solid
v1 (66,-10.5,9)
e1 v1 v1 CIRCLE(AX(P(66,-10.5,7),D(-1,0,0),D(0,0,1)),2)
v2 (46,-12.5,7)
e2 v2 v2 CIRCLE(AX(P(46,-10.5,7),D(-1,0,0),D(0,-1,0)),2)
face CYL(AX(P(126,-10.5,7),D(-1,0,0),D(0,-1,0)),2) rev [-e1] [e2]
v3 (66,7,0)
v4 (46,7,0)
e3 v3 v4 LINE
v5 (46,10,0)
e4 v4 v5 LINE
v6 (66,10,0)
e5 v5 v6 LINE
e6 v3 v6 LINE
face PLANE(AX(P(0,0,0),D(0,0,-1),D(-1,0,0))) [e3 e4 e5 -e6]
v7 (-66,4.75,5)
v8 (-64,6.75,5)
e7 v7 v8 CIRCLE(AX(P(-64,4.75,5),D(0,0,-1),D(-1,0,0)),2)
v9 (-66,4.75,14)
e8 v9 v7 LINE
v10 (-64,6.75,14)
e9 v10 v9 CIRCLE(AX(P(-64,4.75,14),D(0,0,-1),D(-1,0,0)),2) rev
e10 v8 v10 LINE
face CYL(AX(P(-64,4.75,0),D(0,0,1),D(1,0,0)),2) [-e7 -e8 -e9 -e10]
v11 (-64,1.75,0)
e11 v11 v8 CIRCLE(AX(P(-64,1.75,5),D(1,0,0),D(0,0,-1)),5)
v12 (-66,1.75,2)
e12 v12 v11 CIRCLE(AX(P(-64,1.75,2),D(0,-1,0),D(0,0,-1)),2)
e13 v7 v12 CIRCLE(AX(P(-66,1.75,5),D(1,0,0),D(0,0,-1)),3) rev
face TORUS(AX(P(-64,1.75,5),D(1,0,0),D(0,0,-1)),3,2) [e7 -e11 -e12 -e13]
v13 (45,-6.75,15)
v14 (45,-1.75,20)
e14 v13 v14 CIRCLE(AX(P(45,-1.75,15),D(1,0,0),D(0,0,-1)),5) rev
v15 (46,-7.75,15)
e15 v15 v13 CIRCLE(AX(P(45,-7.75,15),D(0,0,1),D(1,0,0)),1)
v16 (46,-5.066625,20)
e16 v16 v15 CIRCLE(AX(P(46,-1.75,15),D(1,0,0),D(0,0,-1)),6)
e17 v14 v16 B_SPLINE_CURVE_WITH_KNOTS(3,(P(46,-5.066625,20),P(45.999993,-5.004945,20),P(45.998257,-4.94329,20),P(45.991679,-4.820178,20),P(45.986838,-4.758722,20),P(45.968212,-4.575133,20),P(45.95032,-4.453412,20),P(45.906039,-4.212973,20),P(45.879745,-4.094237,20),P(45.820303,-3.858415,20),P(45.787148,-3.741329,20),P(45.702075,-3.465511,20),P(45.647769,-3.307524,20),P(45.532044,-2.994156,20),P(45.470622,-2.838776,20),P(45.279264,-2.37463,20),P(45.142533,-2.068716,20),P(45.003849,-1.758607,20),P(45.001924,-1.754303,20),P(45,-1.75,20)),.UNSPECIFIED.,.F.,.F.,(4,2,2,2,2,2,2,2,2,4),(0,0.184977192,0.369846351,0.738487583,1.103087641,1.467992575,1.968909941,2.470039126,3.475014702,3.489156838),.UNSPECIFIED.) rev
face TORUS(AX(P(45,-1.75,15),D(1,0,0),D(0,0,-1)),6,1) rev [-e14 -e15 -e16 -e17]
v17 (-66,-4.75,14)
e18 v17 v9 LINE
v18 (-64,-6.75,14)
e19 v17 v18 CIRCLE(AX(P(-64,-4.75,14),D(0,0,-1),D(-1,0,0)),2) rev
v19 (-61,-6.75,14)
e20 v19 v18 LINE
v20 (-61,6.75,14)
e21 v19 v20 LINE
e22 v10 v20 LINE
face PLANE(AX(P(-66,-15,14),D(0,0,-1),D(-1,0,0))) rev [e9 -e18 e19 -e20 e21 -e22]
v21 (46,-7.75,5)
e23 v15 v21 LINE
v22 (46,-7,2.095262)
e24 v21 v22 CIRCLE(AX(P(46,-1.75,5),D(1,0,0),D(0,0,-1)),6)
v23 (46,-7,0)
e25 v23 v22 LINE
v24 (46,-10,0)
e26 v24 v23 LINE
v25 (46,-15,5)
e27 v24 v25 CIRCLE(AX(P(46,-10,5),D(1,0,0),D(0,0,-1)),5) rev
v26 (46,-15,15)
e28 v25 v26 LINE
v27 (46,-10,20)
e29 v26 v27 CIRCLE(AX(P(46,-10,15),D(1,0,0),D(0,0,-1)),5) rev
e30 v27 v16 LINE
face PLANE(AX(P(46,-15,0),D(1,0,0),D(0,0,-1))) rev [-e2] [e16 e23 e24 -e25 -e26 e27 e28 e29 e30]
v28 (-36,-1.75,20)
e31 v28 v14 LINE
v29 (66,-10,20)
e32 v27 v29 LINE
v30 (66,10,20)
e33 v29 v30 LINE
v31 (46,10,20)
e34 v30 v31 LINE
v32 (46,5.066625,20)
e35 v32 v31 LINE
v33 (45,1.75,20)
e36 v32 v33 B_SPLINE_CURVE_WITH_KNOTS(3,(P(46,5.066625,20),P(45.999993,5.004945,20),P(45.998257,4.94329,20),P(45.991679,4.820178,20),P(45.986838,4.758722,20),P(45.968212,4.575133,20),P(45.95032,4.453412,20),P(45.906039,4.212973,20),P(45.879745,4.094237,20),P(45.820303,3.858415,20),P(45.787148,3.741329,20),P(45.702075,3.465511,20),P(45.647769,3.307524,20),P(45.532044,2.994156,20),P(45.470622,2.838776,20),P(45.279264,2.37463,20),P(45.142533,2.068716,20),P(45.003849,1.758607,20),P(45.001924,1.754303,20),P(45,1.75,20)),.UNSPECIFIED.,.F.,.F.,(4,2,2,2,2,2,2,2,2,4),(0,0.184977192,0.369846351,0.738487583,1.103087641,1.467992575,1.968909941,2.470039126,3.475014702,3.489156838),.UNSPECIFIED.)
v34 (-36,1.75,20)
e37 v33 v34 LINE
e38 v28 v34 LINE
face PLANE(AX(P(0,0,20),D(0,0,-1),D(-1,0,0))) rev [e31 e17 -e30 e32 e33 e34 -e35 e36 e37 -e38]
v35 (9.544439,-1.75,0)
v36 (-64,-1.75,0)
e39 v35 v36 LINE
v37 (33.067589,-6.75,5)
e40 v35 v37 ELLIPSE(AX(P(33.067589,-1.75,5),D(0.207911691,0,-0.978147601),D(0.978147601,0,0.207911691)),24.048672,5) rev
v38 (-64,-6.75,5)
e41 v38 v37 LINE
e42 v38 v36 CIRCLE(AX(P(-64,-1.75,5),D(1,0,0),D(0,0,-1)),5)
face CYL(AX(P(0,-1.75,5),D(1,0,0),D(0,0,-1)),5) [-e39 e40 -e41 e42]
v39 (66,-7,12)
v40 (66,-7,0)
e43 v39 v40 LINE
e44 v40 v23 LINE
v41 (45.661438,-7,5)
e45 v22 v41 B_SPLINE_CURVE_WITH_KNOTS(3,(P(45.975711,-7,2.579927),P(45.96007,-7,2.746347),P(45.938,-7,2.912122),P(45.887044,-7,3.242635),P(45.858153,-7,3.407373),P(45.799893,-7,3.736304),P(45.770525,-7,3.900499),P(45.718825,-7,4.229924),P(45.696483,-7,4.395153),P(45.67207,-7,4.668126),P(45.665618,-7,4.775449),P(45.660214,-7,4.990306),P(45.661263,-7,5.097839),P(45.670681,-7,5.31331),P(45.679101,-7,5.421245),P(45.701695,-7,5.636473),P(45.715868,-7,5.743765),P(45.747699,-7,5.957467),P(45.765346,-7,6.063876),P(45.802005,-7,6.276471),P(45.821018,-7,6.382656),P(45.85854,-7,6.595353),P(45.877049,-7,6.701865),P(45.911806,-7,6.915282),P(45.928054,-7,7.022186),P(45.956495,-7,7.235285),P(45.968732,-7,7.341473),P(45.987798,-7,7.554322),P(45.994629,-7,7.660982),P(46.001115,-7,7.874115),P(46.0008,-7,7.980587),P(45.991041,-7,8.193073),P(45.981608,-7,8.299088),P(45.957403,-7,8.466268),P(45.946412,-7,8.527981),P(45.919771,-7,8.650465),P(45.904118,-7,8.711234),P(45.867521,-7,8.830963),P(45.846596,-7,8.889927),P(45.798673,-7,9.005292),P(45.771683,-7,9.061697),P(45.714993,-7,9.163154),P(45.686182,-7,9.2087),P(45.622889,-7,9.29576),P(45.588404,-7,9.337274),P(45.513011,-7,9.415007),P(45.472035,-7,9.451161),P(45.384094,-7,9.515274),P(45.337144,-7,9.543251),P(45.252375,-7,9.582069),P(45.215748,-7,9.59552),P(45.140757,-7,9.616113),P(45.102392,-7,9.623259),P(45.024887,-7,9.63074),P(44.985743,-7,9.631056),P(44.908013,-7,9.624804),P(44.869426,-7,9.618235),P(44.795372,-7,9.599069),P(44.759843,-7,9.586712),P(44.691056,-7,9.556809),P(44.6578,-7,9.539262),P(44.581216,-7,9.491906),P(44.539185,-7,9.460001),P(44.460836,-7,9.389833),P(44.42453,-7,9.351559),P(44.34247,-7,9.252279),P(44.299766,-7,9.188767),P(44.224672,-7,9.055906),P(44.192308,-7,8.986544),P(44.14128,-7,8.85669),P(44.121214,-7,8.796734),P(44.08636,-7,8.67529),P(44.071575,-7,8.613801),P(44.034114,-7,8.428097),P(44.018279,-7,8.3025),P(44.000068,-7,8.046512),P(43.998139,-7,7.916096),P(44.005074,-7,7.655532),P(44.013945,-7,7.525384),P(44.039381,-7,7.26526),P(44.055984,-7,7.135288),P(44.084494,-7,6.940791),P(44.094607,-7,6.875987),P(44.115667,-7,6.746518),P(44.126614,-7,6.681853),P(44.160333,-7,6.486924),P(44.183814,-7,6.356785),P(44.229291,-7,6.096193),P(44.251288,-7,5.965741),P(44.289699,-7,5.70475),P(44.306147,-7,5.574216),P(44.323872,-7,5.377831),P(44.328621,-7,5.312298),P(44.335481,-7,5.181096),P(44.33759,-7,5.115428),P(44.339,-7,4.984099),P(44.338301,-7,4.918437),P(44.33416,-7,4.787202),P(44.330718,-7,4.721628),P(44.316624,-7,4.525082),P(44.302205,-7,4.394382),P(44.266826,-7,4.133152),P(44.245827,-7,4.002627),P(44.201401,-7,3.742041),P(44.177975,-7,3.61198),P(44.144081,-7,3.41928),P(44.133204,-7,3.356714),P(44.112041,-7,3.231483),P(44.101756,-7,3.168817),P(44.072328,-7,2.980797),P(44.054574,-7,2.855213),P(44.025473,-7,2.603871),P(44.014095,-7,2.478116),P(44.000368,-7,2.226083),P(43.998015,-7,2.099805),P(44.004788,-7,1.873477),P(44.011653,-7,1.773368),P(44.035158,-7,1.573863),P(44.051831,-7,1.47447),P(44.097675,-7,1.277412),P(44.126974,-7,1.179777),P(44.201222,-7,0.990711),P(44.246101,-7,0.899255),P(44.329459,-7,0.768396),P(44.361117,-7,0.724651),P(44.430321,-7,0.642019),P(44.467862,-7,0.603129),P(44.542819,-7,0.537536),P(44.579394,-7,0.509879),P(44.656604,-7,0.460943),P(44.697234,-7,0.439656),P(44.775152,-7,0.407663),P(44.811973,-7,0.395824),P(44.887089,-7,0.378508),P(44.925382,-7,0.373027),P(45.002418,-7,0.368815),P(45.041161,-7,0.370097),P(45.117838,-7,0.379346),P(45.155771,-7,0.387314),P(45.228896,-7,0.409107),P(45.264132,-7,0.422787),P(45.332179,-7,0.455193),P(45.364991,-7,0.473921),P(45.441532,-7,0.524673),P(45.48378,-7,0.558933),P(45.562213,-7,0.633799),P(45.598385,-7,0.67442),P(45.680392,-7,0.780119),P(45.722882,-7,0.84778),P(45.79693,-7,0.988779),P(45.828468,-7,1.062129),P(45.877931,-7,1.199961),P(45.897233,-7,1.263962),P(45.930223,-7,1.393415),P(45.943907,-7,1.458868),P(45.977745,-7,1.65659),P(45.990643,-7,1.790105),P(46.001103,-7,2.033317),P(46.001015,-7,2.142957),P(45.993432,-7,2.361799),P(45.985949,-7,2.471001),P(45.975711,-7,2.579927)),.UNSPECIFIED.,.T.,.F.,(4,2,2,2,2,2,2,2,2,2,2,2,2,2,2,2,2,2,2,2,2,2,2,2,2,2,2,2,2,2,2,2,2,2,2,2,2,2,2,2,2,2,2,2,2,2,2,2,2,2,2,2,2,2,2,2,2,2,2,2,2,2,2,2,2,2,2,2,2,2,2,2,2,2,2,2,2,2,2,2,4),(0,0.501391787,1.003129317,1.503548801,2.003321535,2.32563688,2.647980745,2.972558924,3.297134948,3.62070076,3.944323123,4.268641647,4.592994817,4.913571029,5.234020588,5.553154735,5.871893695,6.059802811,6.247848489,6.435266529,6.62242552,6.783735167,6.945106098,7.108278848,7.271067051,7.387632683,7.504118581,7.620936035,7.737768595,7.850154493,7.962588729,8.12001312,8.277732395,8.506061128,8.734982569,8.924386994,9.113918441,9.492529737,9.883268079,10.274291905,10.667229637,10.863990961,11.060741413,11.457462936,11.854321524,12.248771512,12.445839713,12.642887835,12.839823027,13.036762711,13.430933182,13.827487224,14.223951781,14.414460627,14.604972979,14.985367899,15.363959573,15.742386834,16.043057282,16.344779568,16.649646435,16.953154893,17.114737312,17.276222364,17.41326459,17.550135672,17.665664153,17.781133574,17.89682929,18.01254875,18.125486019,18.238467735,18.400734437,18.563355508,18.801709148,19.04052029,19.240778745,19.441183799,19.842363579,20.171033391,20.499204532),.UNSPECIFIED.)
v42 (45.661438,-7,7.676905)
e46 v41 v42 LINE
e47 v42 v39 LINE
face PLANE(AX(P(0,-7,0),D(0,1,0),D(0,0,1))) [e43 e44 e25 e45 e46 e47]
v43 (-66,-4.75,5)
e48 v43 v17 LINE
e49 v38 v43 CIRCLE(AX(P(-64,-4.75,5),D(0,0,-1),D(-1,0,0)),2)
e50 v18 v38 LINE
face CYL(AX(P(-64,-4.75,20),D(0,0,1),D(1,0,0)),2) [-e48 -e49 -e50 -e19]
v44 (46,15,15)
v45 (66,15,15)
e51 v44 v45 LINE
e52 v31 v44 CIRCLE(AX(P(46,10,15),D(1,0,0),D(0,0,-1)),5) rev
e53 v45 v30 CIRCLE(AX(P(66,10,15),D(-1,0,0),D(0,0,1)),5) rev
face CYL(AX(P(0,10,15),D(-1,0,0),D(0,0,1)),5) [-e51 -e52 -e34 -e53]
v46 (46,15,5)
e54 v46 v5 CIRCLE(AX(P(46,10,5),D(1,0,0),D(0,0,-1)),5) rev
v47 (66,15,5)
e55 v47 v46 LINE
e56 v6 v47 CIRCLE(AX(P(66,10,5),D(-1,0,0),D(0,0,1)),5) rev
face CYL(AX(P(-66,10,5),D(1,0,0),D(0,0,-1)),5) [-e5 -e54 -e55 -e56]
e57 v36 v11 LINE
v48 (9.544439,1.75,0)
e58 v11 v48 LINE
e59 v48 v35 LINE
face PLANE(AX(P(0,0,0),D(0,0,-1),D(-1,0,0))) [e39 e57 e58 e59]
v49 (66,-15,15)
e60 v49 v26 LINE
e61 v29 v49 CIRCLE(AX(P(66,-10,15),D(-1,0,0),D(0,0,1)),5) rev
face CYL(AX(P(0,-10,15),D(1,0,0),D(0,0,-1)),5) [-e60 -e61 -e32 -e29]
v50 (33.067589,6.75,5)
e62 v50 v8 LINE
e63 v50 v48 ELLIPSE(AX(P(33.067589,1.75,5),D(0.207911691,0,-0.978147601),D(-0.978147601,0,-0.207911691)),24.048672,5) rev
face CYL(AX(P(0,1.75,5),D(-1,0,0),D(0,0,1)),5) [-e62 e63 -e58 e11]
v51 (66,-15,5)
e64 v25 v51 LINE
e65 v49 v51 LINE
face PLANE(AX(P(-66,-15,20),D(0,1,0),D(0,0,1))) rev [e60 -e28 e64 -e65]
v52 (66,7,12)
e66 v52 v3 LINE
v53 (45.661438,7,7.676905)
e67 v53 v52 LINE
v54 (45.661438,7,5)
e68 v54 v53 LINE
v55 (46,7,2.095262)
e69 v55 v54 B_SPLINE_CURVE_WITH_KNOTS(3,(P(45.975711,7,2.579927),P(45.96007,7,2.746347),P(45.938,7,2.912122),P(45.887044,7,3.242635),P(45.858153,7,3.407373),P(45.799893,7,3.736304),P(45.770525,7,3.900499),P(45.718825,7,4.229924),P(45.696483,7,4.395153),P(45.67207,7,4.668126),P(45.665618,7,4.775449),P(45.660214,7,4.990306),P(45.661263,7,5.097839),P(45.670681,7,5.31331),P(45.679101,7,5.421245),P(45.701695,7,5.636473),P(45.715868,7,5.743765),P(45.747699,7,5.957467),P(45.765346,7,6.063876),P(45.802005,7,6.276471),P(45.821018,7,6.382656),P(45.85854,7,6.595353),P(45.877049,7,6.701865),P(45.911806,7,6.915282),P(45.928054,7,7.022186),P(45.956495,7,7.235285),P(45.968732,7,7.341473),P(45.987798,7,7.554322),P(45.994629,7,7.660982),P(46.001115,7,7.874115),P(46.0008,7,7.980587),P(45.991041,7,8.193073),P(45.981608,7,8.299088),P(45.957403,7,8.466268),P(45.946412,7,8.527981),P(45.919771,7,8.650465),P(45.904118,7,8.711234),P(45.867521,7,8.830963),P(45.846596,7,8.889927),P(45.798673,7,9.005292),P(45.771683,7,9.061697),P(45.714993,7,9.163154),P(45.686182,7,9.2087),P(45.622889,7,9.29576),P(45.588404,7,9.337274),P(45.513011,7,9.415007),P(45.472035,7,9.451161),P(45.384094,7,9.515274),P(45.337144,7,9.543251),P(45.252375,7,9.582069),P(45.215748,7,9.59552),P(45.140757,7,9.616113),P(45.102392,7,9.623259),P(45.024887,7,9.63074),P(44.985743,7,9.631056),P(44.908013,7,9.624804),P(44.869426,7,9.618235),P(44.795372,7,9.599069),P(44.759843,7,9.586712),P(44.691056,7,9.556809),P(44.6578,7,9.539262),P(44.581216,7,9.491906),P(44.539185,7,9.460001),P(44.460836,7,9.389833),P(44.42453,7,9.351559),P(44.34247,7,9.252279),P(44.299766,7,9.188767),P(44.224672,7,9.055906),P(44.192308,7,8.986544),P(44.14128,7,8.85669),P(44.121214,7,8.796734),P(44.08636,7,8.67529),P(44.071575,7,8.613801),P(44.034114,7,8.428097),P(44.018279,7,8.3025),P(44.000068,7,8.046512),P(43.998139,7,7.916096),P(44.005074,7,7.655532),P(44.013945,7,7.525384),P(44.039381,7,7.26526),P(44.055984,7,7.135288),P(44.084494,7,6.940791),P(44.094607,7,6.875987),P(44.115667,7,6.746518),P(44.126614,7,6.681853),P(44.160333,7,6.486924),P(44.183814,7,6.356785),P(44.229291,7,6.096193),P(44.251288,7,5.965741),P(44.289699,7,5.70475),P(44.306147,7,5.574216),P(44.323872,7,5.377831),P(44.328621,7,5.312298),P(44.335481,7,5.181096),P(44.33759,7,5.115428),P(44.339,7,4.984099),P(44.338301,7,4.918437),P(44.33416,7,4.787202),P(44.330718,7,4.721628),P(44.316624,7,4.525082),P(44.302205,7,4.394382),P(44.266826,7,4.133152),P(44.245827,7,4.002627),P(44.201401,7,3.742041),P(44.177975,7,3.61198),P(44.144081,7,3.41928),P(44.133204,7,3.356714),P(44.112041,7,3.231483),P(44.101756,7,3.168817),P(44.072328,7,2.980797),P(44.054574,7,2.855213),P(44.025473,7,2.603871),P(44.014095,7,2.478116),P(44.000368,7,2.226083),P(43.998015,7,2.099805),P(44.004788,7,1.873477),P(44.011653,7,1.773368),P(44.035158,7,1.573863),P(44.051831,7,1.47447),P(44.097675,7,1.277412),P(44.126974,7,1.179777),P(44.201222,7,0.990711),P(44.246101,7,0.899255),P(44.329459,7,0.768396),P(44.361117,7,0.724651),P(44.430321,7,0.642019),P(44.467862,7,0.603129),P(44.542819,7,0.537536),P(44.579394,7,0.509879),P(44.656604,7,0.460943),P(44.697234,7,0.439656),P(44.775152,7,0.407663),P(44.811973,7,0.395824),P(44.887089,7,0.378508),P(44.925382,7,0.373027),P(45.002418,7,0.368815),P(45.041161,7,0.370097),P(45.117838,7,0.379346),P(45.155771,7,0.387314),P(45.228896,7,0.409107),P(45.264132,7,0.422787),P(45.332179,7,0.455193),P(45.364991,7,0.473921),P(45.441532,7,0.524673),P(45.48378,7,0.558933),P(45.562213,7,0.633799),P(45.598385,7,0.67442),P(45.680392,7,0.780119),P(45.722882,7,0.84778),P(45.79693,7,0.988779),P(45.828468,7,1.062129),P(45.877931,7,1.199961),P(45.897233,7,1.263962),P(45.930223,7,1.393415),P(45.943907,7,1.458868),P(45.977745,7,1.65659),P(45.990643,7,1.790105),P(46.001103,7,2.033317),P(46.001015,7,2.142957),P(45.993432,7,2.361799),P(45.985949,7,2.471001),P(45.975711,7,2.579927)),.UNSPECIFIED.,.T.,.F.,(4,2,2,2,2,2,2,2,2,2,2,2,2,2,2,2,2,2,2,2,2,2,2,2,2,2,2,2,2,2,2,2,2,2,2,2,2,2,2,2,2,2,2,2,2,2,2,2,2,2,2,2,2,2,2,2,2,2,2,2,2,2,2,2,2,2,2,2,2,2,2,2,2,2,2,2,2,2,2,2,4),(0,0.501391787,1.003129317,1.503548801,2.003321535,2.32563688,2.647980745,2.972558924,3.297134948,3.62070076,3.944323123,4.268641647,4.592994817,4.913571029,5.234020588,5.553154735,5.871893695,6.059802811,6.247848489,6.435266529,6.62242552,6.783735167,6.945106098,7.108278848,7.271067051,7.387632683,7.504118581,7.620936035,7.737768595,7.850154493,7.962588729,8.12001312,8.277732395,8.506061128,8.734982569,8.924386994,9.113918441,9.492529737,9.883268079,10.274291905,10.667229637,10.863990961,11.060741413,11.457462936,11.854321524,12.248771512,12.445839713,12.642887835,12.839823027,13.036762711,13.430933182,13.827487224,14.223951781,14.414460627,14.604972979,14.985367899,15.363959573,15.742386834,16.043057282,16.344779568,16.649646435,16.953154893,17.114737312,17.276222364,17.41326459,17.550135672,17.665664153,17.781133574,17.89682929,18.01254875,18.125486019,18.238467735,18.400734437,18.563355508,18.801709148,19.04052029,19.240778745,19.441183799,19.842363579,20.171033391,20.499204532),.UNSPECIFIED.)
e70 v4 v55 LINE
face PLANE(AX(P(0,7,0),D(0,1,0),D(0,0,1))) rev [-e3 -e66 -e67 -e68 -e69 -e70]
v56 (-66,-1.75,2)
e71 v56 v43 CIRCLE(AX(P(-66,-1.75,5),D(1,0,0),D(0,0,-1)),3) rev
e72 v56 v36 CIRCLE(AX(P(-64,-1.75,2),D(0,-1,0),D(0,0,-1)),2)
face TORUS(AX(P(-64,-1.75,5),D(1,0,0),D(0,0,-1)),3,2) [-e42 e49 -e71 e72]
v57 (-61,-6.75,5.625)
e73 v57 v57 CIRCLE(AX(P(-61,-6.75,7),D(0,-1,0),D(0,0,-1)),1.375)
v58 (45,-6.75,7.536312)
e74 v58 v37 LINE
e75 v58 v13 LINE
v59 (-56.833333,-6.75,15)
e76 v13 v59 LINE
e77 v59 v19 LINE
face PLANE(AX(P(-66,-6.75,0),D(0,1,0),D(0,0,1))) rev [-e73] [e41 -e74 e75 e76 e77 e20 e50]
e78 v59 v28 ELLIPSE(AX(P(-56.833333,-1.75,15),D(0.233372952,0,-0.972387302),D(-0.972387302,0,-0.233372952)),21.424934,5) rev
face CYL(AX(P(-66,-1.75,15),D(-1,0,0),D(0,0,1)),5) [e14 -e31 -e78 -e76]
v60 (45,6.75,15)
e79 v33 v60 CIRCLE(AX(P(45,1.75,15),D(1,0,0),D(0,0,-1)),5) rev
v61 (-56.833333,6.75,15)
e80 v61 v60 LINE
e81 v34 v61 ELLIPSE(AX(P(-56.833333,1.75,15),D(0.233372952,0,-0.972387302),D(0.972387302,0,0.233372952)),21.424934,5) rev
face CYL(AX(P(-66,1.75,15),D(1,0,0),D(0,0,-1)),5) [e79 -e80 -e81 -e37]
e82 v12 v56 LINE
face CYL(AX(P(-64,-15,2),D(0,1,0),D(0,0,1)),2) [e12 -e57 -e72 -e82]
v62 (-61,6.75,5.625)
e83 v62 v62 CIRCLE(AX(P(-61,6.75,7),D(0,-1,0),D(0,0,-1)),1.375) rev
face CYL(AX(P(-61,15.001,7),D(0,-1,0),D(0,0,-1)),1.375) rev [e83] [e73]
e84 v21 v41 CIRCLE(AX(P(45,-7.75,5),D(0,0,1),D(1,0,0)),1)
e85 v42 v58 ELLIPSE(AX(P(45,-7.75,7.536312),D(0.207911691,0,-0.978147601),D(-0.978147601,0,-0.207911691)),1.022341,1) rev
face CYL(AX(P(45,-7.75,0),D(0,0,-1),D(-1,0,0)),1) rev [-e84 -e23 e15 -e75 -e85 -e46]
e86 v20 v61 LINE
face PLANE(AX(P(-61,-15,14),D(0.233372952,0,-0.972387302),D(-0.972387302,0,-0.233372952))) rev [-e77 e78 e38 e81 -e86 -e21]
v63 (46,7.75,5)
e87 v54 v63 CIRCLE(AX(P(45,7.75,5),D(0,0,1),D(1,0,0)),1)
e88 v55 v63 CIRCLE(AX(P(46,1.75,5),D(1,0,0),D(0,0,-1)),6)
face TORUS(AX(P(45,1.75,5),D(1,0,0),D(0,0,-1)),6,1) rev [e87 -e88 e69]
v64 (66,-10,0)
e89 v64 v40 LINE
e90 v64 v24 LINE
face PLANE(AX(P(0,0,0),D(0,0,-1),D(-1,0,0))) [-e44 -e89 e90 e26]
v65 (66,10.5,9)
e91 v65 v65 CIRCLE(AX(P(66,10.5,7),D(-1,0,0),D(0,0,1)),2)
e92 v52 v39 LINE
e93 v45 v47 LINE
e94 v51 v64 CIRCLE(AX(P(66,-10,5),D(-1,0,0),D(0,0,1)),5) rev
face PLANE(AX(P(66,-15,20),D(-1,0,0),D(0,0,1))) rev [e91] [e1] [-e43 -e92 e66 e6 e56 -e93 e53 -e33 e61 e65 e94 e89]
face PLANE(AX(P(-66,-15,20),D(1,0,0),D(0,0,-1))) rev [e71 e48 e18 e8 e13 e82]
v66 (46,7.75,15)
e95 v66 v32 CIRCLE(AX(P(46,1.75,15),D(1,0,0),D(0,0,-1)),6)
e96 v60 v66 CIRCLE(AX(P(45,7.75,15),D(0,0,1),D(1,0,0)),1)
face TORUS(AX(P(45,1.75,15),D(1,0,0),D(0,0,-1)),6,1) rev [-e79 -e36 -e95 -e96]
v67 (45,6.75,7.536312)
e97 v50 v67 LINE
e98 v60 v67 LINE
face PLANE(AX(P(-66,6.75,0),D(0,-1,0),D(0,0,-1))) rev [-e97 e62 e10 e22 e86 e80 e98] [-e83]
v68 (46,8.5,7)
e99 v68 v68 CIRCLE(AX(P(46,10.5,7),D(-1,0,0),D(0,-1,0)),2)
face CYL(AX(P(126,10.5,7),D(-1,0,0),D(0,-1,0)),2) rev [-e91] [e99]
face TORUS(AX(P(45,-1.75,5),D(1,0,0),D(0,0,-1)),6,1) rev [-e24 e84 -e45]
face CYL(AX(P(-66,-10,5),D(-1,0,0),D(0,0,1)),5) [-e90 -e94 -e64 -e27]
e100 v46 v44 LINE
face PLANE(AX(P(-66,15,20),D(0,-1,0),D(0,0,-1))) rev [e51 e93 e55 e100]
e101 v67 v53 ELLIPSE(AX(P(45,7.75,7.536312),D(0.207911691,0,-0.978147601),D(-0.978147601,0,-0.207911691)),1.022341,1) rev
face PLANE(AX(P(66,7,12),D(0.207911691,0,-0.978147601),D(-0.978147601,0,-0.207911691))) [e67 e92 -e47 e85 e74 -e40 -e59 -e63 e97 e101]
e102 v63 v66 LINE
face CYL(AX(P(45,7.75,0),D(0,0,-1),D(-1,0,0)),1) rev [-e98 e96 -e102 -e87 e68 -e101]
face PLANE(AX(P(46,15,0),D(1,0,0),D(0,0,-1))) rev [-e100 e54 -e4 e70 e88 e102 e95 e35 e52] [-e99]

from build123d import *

# Parameters (mm, degrees)
ESQUISSE1_W                  = 132
ESQUISSE1_H                  = 30
BOSS_EXTRU_1_DEPTH           = 20
ESQUISSE3_W                  = 112
ESQUISSE3_H                  = 8.25
ENL_V_MAT_EXTRU_1_DEPTH      = 71.576199954
ENL_V_MAT_EXTRU_2_REACH      = 74.312
ESQUISSE4_R                  = 1.375
ESQUISSE5_R                  = 2
ENL_V_MAT_EXTRU_3_DEPTH      = 80
CONG_1_R                     = 5
CONG_2_R                     = 5
CONG_3_R                     = 1
ENL_V_MAT_EXTRU_4_DEPTH      = 7
ENL_V_MAT_EXTRU_4_DEPTH_BACK = 7
CONG_4_R                     = 2
ENL_V_MAT_EXTRU_5_DEPTH      = 71.576200076
ENL_V_MAT_EXTRU_5_DEPTH_BACK = 71.576200076


with BuildPart() as part:
    # Esquisse1 → Boss.-Extru.1 (new body)
    with BuildSketch(Plane.XY):
        Rectangle(ESQUISSE1_W, ESQUISSE1_H)
    extrude(amount=BOSS_EXTRU_1_DEPTH)

    # Esquisse3 → Enlèv. mat.-Extru.1 (cut, through all)
    with BuildSketch(Plane.XY.offset(20)):
        with Locations((-10, 10.875)):
            Rectangle(ESQUISSE3_W, ESQUISSE3_H)
        with Locations((-10, -10.875)):
            Rectangle(ESQUISSE3_W, ESQUISSE3_H)
    extrude(amount=-ENL_V_MAT_EXTRU_1_DEPTH, mode=Mode.SUBTRACT)

    # Esquisse4 → Enlèv. mat.-Extru.2 (cut, up to next)
    with BuildSketch(Plane.XZ.offset(6.75), mode=Mode.PRIVATE) as enl_v_mat_extru_2_sk1:
        with Locations(Location((-61, 7, 0), (0, 0, 270))):
            Circle(ESQUISSE4_R)
    enl_v_mat_extru_2_tool1 = extrude(enl_v_mat_extru_2_sk1.sketch, amount=-ENL_V_MAT_EXTRU_2_REACH, mode=Mode.PRIVATE) & part.part
    add(enl_v_mat_extru_2_tool1.solids().sort_by_distance((-61, -6.75, 7))[0], mode=Mode.SUBTRACT)

    # Esquisse5 → Enlèv. mat.-Extru.3 (cut)
    with BuildSketch(Plane.ZY.offset(-46)):
        with Locations(Location((7, -10.5, 0), (0, 0, 270))):
            Circle(ESQUISSE5_R)
        with Locations(Location((7, 10.5, 0), (0, 0, 270))):
            Circle(ESQUISSE5_R)
    extrude(amount=-ENL_V_MAT_EXTRU_3_DEPTH, mode=Mode.SUBTRACT)

    # Congé1
    cong_1_edges = [part.edges().sort_by_distance(p)[0] for p in [
        (56, -15, 0),
        (56, -15, 20),
        (56, 15, 0),
        (56, 15, 20),
    ]]
    fillet(cong_1_edges, radius=CONG_1_R)

    # Congé2
    cong_2_edges = [part.edges().sort_by_distance(p)[0] for p in [
        (-10, 6.75, 0),
        (-10, 6.75, 20),
        (-10, -6.75, 0),
        (-10, -6.75, 20),
    ]]
    fillet(cong_2_edges, radius=CONG_2_R)

    # Congé3
    # the kernel refuses this fillet: 1 mm, written as the material it adds along each edge
    with BuildSketch(Plane(origin=(46, -6.75, 15), x_dir=(0, -1, 0), z_dir=(0, 0, -1))) as cong_3_piece_1:
        with BuildLine():
            CenterArc((CONG_3_R, CONG_3_R), CONG_3_R, 180, 90)
            Line((0, CONG_3_R), (0, 0))
            Line((0, 0), (CONG_3_R, 0))
        make_face()
    extrude(amount=10)
    with BuildSketch(Plane(origin=(46, 6.75, 15), x_dir=(0, 1, 0), z_dir=(0, 0, -1))) as cong_3_piece_2:
        with BuildLine():
            CenterArc((CONG_3_R, -CONG_3_R), CONG_3_R, 90, 90)
            Line((0, -CONG_3_R), (0, 0))
            Line((0, 0), (CONG_3_R, 0))
        make_face()
    extrude(amount=10)
    with BuildSketch(Plane(origin=(46, -1.75, 15), x_dir=(0, 0.7515057138603058, 0.6597265812708415), z_dir=(0, 0.6597265812708415, -0.7515057138603058))) as cong_3_piece_3_section:
        with BuildLine():
            CenterArc((5 + CONG_3_R, -CONG_3_R), CONG_3_R, 90, 90)
            Line((5, -CONG_3_R), (5, 0))
            Line((5, 0), (5 + CONG_3_R, 0))
        make_face()
    cong_3_piece_3 = revolve(axis=Axis((46, -1.75, 15), (1, 0, 0)), revolution_arc=138.720976341, mode=Mode.PRIVATE)
    cong_3_piece_3 = split(cong_3_piece_3, bisect_by=Plane(origin=(46, -1.75, 20), z_dir=(0, 0, -1)), keep=Keep.TOP, mode=Mode.PRIVATE)
    add(cong_3_piece_3)
    with BuildSketch(Plane(origin=(46, 1.75, 15), x_dir=(0, -0.7515057138603058, 0.6597265812708415), z_dir=(0, -0.6597265812708415, -0.7515057138603058))) as cong_3_piece_4_section:
        with BuildLine():
            CenterArc((5 + CONG_3_R, CONG_3_R), CONG_3_R, 180, 90)
            Line((5, CONG_3_R), (5, 0))
            Line((5, 0), (5 + CONG_3_R, 0))
        make_face()
    cong_3_piece_4 = revolve(axis=Axis((46, 1.75, 15), (-1, 0, 0)), revolution_arc=138.720976341, mode=Mode.PRIVATE)
    cong_3_piece_4 = split(cong_3_piece_4, bisect_by=Plane(origin=(46, 1.75, 20), z_dir=(0, 0, -1)), keep=Keep.TOP, mode=Mode.PRIVATE)
    add(cong_3_piece_4)
    with BuildSketch(Plane(origin=(46, 1.75, 5), x_dir=(0, -0.7515057138603056, -0.6597265812708417), z_dir=(0, -0.6597265812708417, 0.7515057138603056))) as cong_3_piece_5_section:
        with BuildLine():
            CenterArc((5 + CONG_3_R, -CONG_3_R), CONG_3_R, 90, 90)
            Line((5, -CONG_3_R), (5, 0))
            Line((5, 0), (5 + CONG_3_R, 0))
        make_face()
    cong_3_piece_5 = revolve(axis=Axis((46, 1.75, 5), (1, 0, 0)), revolution_arc=138.720976341, mode=Mode.PRIVATE)
    cong_3_piece_5 = split(cong_3_piece_5, bisect_by=Plane(origin=(46, 1.75, 0), z_dir=(0, 0, 1)), keep=Keep.TOP, mode=Mode.PRIVATE)
    add(cong_3_piece_5)
    with BuildSketch(Plane(origin=(46, -1.75, 5), x_dir=(0, 0.7515057138603056, -0.6597265812708416), z_dir=(0, 0.6597265812708416, 0.7515057138603056))) as cong_3_piece_6_section:
        with BuildLine():
            CenterArc((5 + CONG_3_R, CONG_3_R), CONG_3_R, 180, 90)
            Line((5, CONG_3_R), (5, 0))
            Line((5, 0), (5 + CONG_3_R, 0))
        make_face()
    cong_3_piece_6 = revolve(axis=Axis((46, -1.75, 5), (-1, 0, 0)), revolution_arc=138.720976341, mode=Mode.PRIVATE)
    cong_3_piece_6 = split(cong_3_piece_6, bisect_by=Plane(origin=(46, -1.75, 0), z_dir=(0, 0, 1)), keep=Keep.TOP, mode=Mode.PRIVATE)
    add(cong_3_piece_6)

    # Esquisse7 → Enlèv. mat.-Extru.4 (cut, two sides: drawn at the far end of the back side and taken through both)
    with BuildSketch(Plane(origin=(0, 0, 0), x_dir=(1, 0, 0), z_dir=(0, 1, 0)).offset(-ENL_V_MAT_EXTRU_4_DEPTH_BACK)):
        Polygon((66, -12), (9.544438686, 0), (66, 0), align=None)
    extrude(amount=ENL_V_MAT_EXTRU_4_DEPTH + ENL_V_MAT_EXTRU_4_DEPTH_BACK, mode=Mode.SUBTRACT)

    # Congé4
    cong_4_edges = [part.edges().sort_by_distance(p)[0] for p in [
        (-66, -6.75, 10),
        (-66, 0, 20),
        (-66, 6.75, 10),
        (-66, 0, 0),
        (-66, -5.285533906, 1.464466094),
        (-66, 5.285533906, 1.464466094),
        (-66, 5.285533906, 18.535533906),
        (-66, -5.285533906, 18.535533906),
    ]]
    fillet(cong_4_edges, radius=CONG_4_R)

    # Esquisse8 → Enlèv. mat.-Extru.5 (cut, two sides: drawn at the far end of the back side and taken through both)
    with BuildSketch(Plane(origin=(0, 0, 0), x_dir=(1, 0, 0), z_dir=(0, 1, 0)).offset(-ENL_V_MAT_EXTRU_5_DEPTH_BACK)):
        Polygon((-36, -20), (-66, -20), (-66, -14), (-61, -14), align=None)
    extrude(amount=ENL_V_MAT_EXTRU_5_DEPTH + ENL_V_MAT_EXTRU_5_DEPTH_BACK, mode=Mode.SUBTRACT)


solid = part.part
